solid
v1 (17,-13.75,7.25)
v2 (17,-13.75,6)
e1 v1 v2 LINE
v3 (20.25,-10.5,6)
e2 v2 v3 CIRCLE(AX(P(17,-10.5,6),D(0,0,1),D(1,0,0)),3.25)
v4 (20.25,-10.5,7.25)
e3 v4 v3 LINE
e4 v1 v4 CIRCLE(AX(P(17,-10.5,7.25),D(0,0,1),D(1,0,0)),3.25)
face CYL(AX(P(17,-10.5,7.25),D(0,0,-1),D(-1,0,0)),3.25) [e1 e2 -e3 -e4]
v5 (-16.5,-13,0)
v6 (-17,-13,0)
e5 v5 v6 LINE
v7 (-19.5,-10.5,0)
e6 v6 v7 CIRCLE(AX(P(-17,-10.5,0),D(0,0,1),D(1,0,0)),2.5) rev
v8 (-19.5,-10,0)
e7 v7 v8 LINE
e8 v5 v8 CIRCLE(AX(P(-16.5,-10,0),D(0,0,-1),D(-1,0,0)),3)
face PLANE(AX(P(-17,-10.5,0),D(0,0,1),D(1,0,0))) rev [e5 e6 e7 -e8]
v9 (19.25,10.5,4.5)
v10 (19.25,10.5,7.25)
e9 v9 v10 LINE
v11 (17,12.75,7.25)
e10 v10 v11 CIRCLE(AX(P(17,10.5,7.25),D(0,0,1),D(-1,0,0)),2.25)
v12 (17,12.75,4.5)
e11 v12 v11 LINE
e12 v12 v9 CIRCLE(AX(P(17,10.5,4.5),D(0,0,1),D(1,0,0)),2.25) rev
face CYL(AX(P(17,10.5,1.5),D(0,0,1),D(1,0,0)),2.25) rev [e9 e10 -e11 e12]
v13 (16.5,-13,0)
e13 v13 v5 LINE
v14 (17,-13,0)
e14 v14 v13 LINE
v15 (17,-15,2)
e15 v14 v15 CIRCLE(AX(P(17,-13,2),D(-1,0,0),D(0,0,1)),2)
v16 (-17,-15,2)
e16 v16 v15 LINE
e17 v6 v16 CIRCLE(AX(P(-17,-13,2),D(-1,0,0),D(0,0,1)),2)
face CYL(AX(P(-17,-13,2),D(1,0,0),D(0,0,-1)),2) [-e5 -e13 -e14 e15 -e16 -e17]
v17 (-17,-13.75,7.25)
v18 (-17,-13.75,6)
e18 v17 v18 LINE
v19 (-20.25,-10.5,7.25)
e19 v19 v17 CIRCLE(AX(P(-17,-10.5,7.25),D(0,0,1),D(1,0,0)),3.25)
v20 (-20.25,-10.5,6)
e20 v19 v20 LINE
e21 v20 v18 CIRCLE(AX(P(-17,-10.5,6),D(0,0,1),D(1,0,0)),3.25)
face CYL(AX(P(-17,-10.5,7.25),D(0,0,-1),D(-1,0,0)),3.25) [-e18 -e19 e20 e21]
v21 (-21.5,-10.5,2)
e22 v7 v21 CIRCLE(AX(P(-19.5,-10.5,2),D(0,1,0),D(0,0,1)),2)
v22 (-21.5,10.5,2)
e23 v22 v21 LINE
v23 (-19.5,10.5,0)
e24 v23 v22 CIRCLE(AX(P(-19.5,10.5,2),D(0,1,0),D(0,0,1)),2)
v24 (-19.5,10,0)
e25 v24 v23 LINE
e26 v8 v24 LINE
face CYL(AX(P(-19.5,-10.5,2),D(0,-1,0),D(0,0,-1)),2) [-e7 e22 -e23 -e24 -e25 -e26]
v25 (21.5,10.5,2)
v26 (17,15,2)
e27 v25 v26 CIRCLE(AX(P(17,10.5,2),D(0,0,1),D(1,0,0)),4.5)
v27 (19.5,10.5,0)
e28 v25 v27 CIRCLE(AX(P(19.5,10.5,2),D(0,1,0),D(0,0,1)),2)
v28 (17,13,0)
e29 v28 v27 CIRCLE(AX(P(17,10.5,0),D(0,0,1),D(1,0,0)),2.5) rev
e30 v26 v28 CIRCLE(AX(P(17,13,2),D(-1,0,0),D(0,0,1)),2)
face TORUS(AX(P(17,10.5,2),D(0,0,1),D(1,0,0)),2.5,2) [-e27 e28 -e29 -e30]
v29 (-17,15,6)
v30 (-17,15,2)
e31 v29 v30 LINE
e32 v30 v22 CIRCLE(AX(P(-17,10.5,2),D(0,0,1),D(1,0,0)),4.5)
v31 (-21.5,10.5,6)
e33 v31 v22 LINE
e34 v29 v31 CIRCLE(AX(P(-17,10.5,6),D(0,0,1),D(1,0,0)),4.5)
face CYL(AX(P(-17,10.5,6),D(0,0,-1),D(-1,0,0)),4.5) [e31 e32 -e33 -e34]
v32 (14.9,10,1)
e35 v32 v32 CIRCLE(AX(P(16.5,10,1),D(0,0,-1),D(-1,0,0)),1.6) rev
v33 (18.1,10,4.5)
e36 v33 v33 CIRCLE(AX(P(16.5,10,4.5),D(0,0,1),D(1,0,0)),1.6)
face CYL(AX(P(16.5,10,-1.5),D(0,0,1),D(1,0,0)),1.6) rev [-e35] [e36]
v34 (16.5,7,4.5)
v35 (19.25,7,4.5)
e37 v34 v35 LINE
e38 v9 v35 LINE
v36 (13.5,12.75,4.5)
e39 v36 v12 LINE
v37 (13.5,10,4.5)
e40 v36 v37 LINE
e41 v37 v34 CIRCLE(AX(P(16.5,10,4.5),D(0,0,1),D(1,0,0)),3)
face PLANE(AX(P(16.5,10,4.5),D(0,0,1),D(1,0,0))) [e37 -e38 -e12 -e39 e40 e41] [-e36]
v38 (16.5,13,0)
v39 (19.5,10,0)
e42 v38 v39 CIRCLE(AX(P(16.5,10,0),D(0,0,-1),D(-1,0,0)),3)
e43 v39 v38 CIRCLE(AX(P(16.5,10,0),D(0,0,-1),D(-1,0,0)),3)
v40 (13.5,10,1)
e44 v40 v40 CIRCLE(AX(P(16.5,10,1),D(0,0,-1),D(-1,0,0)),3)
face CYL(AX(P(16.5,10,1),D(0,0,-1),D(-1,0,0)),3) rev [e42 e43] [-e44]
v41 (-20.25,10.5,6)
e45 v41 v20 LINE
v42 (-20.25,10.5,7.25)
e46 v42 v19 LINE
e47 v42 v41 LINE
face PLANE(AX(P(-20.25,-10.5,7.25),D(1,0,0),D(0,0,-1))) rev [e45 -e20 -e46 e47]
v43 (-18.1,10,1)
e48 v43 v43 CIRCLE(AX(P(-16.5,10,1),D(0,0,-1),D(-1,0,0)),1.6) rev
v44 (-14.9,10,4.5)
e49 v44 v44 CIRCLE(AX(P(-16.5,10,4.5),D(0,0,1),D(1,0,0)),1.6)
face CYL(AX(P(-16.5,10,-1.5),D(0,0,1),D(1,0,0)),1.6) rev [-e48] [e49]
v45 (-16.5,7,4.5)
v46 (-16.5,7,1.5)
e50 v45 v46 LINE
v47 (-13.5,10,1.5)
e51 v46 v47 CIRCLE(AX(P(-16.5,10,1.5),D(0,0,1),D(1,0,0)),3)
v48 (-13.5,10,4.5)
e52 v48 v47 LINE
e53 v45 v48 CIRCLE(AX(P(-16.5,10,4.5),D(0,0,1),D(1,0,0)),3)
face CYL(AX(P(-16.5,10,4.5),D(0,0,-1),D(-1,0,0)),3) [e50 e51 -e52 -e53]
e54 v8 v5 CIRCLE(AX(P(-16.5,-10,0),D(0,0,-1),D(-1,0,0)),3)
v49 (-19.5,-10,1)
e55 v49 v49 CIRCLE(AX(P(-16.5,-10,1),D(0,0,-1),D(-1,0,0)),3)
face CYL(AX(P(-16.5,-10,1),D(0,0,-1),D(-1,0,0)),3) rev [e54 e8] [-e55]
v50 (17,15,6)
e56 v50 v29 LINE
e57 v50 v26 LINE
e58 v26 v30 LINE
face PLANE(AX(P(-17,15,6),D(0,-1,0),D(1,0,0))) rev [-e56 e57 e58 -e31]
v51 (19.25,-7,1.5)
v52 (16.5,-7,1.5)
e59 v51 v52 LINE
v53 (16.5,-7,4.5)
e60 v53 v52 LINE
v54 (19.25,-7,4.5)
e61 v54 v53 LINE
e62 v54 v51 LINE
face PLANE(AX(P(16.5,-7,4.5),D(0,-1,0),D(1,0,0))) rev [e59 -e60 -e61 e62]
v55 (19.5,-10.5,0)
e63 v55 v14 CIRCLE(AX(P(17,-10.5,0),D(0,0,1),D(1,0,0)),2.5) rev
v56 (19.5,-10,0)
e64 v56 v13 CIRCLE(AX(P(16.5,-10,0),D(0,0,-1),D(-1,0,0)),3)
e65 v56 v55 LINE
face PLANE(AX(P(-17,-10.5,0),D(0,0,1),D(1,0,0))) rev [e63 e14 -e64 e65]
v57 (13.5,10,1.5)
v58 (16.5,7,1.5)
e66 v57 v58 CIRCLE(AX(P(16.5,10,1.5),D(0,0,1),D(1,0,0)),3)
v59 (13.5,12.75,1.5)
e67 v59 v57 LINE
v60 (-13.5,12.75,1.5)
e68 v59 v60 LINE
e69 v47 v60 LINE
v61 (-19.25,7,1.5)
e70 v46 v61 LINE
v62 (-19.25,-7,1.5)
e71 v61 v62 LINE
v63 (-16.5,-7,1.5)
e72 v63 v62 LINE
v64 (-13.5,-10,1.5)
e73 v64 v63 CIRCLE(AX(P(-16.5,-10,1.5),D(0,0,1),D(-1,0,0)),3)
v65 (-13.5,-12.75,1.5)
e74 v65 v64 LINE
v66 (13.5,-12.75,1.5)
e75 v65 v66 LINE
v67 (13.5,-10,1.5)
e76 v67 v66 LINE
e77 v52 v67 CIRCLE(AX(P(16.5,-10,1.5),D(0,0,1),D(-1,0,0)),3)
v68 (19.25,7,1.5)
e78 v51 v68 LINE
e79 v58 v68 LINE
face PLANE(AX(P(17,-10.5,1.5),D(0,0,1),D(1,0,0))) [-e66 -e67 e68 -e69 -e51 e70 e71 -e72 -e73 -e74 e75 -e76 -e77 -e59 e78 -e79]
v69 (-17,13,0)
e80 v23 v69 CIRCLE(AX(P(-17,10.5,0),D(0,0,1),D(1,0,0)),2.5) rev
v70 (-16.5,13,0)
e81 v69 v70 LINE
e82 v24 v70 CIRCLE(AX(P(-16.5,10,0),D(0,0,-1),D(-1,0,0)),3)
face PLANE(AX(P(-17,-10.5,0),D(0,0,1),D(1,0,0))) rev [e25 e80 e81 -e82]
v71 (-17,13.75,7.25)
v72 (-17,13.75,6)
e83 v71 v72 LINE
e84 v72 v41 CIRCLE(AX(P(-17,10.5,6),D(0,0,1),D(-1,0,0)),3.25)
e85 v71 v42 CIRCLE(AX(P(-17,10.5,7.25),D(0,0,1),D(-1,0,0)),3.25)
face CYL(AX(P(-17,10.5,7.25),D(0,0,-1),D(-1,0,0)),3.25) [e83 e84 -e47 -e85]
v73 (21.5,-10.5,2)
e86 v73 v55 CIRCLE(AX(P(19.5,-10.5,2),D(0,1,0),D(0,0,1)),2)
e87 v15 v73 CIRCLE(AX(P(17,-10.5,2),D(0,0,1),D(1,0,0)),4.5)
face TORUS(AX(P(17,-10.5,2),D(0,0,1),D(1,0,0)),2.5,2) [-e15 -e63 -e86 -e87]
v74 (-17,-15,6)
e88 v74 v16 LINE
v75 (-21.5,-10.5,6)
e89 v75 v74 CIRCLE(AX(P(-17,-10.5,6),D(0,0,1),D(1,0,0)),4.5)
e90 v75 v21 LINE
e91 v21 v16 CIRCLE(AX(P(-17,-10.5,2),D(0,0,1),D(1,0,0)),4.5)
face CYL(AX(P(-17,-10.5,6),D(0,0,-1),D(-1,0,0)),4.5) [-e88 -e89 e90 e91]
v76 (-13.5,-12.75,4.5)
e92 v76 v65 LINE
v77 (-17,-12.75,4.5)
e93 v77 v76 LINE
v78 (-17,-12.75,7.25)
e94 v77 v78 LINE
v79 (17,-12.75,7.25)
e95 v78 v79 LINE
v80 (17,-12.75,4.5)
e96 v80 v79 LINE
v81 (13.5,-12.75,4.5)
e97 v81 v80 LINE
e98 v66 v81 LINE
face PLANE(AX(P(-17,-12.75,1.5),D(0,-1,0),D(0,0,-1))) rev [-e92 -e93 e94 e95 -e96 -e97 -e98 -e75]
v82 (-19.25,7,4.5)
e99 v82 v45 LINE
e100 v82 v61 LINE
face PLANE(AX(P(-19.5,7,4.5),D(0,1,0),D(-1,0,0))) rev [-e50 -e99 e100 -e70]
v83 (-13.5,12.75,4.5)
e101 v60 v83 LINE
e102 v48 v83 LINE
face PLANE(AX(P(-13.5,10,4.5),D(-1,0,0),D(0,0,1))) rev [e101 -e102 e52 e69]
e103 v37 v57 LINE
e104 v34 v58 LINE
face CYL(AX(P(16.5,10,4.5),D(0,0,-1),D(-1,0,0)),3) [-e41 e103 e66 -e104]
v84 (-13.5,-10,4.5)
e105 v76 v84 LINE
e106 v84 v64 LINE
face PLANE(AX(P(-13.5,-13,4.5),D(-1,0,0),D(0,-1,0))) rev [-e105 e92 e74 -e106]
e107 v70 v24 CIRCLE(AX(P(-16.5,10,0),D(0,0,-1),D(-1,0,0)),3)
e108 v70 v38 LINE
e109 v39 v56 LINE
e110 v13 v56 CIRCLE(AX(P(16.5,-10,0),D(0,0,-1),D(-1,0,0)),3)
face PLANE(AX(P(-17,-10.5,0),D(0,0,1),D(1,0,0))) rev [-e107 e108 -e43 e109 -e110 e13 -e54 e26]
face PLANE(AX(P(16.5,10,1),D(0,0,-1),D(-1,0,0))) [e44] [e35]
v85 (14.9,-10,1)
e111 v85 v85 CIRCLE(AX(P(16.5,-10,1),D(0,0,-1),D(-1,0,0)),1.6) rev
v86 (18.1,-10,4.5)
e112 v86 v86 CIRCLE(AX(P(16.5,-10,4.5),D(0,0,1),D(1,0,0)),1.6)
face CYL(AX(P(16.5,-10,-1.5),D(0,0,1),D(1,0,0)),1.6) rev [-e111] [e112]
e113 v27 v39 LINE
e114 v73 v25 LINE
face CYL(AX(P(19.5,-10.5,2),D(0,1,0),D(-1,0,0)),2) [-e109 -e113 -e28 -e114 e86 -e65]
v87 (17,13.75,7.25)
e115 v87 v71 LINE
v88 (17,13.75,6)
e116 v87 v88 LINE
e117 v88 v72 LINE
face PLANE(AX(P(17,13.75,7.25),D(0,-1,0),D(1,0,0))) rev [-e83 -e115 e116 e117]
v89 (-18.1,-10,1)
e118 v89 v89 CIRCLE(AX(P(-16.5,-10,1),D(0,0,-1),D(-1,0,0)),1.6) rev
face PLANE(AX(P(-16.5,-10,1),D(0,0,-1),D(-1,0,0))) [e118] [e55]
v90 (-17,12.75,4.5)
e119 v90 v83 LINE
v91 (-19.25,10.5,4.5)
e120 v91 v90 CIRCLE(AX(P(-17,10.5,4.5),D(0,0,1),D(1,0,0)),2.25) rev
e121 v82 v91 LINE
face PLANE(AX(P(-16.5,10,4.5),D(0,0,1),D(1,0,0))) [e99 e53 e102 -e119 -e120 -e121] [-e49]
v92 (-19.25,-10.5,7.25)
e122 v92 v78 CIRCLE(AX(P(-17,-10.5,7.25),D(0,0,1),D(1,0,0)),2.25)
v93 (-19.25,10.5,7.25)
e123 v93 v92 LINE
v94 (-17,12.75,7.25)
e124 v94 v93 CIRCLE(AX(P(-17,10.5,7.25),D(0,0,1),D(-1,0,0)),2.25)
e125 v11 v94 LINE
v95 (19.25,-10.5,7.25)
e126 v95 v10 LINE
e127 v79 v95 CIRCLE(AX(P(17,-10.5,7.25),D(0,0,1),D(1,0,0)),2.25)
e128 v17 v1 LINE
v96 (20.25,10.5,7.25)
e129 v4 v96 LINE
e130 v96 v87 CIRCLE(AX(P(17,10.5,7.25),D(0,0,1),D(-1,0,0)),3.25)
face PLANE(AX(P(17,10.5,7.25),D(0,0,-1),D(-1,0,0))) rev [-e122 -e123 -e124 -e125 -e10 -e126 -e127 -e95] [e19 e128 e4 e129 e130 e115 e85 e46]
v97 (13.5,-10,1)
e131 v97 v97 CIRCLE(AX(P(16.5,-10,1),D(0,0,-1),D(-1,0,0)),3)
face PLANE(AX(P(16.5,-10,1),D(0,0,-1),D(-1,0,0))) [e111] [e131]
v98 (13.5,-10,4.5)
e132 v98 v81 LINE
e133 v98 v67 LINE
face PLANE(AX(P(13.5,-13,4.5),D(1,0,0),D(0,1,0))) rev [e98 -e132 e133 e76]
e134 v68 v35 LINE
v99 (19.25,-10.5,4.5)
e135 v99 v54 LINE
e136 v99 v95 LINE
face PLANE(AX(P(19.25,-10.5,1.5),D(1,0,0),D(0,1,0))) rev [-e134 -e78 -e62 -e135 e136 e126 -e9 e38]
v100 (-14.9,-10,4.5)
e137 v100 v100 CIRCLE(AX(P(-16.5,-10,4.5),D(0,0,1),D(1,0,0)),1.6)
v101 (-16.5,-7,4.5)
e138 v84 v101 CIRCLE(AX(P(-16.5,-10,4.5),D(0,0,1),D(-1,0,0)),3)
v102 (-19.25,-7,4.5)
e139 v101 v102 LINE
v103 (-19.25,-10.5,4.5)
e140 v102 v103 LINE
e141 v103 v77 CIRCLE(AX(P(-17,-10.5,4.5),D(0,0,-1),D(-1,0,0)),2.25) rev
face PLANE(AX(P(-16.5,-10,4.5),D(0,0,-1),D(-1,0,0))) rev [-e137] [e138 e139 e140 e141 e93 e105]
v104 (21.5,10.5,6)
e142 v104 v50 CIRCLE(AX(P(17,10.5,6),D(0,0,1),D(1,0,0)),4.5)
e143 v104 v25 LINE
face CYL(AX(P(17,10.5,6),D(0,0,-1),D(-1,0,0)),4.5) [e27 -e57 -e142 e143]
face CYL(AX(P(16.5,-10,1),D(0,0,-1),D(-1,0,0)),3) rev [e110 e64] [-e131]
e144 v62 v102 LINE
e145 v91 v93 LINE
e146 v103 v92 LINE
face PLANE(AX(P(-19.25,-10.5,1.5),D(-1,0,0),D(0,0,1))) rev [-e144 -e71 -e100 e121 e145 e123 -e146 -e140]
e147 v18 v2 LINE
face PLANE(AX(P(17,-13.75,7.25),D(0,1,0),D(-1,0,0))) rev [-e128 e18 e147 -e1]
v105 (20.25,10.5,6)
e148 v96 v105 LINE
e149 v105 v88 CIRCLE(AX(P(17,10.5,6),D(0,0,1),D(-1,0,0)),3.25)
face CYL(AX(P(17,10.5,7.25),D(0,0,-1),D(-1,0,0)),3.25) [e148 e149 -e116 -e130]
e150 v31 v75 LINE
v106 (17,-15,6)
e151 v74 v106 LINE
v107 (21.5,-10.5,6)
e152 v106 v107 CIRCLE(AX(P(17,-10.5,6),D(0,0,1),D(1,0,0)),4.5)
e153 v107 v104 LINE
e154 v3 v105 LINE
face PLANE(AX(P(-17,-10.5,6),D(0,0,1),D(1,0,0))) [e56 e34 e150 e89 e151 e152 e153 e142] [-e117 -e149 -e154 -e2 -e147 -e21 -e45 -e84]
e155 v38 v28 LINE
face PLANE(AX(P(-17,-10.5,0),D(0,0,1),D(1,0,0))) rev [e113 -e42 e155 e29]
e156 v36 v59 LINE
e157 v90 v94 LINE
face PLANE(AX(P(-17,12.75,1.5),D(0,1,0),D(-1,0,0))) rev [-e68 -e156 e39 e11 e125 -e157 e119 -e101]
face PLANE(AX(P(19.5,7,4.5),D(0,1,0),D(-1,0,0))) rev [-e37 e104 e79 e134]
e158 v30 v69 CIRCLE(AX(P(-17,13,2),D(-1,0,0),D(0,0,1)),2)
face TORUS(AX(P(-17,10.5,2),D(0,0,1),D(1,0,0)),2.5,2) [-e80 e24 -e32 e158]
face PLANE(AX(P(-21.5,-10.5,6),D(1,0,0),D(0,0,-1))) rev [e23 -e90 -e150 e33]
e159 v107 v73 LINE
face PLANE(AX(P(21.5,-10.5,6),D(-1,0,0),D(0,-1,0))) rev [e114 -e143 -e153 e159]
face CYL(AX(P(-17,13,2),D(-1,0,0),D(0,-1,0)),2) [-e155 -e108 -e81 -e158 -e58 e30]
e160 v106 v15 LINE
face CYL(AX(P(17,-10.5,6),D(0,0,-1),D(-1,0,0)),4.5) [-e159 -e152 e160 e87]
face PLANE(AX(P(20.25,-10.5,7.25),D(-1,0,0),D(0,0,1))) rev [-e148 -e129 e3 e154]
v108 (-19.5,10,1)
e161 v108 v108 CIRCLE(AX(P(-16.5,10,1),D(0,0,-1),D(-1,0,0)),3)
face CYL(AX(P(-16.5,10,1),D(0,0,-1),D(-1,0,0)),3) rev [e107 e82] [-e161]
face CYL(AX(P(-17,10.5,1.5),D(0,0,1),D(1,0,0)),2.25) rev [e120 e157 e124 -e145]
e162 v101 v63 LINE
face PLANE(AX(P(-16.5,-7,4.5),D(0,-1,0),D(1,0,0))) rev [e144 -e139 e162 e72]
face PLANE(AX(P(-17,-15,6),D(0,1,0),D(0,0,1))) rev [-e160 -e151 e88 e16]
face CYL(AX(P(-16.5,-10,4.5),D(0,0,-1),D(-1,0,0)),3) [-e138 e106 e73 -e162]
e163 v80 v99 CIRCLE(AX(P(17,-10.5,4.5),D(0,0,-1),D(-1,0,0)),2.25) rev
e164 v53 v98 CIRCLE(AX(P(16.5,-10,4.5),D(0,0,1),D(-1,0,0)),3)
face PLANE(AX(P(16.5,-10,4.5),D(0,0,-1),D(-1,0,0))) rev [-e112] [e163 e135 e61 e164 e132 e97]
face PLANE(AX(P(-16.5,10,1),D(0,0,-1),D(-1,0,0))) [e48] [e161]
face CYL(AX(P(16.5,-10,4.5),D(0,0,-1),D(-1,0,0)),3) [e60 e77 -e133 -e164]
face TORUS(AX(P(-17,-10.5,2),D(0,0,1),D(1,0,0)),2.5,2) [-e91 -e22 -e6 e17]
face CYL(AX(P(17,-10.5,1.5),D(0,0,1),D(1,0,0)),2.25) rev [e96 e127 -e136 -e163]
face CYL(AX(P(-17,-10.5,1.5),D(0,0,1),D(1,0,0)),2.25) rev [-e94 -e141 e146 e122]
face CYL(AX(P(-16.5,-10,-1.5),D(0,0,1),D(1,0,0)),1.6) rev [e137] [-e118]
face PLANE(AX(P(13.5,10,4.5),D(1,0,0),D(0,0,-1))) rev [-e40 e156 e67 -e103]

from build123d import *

# Parameters (mm, degrees)
EXTRUDE_1_DEPTH     = 6
CUT_EXTRUDE_1_DEPTH = 4.5
EXTRUDE_4_DEPTH     = 3
SKETCH_4_R          = 1.6
CUT_EXTRUDE_2_DEPTH = 6
EXTRUDE_START       = 1.25
EXTRUDE_5_DEPTH     = 1.25
SKETCH_6_R          = 3
CUT_EXTRUDE_3_DEPTH = 1
FILLET_1_R          = 2


with BuildPart() as part:
    # Эскиз1 → Бобышка-Вытянуть1 (new body)
    with BuildSketch(Plane.XY):
        with BuildLine():
            Line((-17, -15), (17, -15))
            ThreePointArc((17, -15), (20.181980515, -13.681980515), (21.5, -10.5))
            Line((21.5, -10.5), (21.5, 10.5))
            ThreePointArc((21.5, 10.5), (20.181980515, 13.681980515), (17, 15))
            Line((17, 15), (-17, 15))
            ThreePointArc((-17, 15), (-20.181980515, 13.681980515), (-21.5, 10.5))
            Line((-21.5, 10.5), (-21.5, -10.5))
            ThreePointArc((-21.5, -10.5), (-20.181980515, -13.681980515), (-17, -15))
        make_face()
    extrude(amount=EXTRUDE_1_DEPTH)

    # Эскиз2 → Вырез-Вытянуть1 (cut)
    with BuildSketch(Plane.XY.offset(6)):
        with BuildLine():
            Line((-17, -12.75), (17, -12.75))
            ThreePointArc((17, -12.75), (18.590990258, -12.090990258), (19.25, -10.5))
            Line((19.25, -10.5), (19.25, 10.5))
            ThreePointArc((19.25, 10.5), (18.590990258, 12.090990258), (17, 12.75))
            Line((17, 12.75), (-17, 12.75))
            ThreePointArc((-17, 12.75), (-18.590990258, 12.090990258), (-19.25, 10.5))
            Line((-19.25, 10.5), (-19.25, -10.5))
            ThreePointArc((-19.25, -10.5), (-18.590990258, -12.090990258), (-17, -12.75))
        make_face()
    extrude(amount=-CUT_EXTRUDE_1_DEPTH, mode=Mode.SUBTRACT)

    # Эскиз3 → Бобышка-Вытянуть4 (add)
    with BuildSketch(Plane.XY.offset(1.5)):
        with BuildLine():
            Line((-13.5, 10), (-13.5, 13))
            Line((-13.5, 13), (-19.5, 13))
            Line((-19.5, 13), (-19.5, 7))
            Line((-19.5, 7), (-16.5, 7))
            ThreePointArc((-16.5, 7), (-14.378679656, 7.878679656), (-13.5, 10))
        make_face()
        with BuildLine():
            Line((-16.5, -7), (-19.5, -7))
            Line((-19.5, -7), (-19.5, -13))
            Line((-19.5, -13), (-13.5, -13))
            Line((-13.5, -13), (-13.5, -10))
            ThreePointArc((-13.5, -10), (-14.378679656, -7.878679656), (-16.5, -7))
        make_face()
        with BuildLine():
            Line((16.5, -7), (19.5, -7))
            Line((19.5, -7), (19.5, -13))
            Line((19.5, -13), (13.5, -13))
            Line((13.5, -13), (13.5, -10))
            ThreePointArc((13.5, -10), (14.378679656, -7.878679656), (16.5, -7))
        make_face()
        with BuildLine():
            Line((13.5, 10), (13.5, 13))
            Line((13.5, 13), (19.5, 13))
            Line((19.5, 13), (19.5, 7))
            Line((19.5, 7), (16.5, 7))
            ThreePointArc((16.5, 7), (14.378679656, 7.878679656), (13.5, 10))
        make_face()
    extrude(amount=EXTRUDE_4_DEPTH)

    # Эскиз4 → Вырез-Вытянуть2 (cut)
    with BuildSketch(Plane.XY.offset(4.5)):
        with Locations((16.5, -10)):
            Circle(SKETCH_4_R)
        with Locations((-16.5, -10)):
            Circle(SKETCH_4_R)
        with Locations((-16.5, 10)):
            Circle(SKETCH_4_R)
        with Locations((16.5, 10)):
            Circle(SKETCH_4_R)
    extrude(amount=-CUT_EXTRUDE_2_DEPTH, mode=Mode.SUBTRACT)

    # Эскиз5 → Бобышка-Вытянуть5 (add)
    with BuildSketch(Plane.XY.offset(6).offset(EXTRUDE_START)):
        with BuildLine():
            Line((17, -13.75), (-17, -13.75))
            ThreePointArc((-17, -13.75), (-19.298097039, -12.798097039), (-20.25, -10.5))
            Line((-20.25, -10.5), (-20.25, 10.5))
            ThreePointArc((-20.25, 10.5), (-19.298097039, 12.798097039), (-17, 13.75))
            Line((-17, 13.75), (17, 13.75))
            ThreePointArc((17, 13.75), (19.298097039, 12.798097039), (20.25, 10.5))
            Line((20.25, 10.5), (20.25, -10.5))
            ThreePointArc((20.25, -10.5), (19.298097039, -12.798097039), (17, -13.75))
        make_face()
        with BuildLine():
            Line((17, -12.75), (-17, -12.75))
            ThreePointArc((-17, -12.75), (-18.590990258, -12.090990258), (-19.25, -10.5))
            Line((-19.25, -10.5), (-19.25, 10.5))
            ThreePointArc((-19.25, 10.5), (-18.590990258, 12.090990258), (-17, 12.75))
            Line((-17, 12.75), (17, 12.75))
            ThreePointArc((17, 12.75), (18.590990258, 12.090990258), (19.25, 10.5))
            Line((19.25, 10.5), (19.25, -10.5))
            ThreePointArc((19.25, -10.5), (18.590990258, -12.090990258), (17, -12.75))
        make_face(mode=Mode.SUBTRACT)
    extrude(amount=-EXTRUDE_5_DEPTH)

    # Эскиз6 → Вырез-Вытянуть3 (cut)
    with BuildSketch(Plane(origin=(0, 0, 0), x_dir=(-1, 0, 0), z_dir=(0, 0, -1))):
        with Locations((16.5, -10)):
            Circle(SKETCH_6_R)
        with Locations((-16.5, -10)):
            Circle(SKETCH_6_R)
        with Locations((16.5, 10)):
            Circle(SKETCH_6_R)
        with Locations((-16.5, 10)):
            Circle(SKETCH_6_R)
    extrude(amount=-CUT_EXTRUDE_3_DEPTH, mode=Mode.SUBTRACT)

    # Скругление1
    fillet_1_edges = [part.edges().sort_by_distance(p)[0] for p in [
        (21.5, 0, 0),
        (20.181980515, -13.681980515, 0),
        (0, -15, 0),
        (-20.181980515, -13.681980515, 0),
        (-21.5, 0, 0),
        (-20.181980515, 13.681980515, 0),
        (0, 15, 0),
        (20.181980515, 13.681980515, 0),
    ]]
    fillet(fillet_1_edges, radius=FILLET_1_R - 0.0001)  # a hair under: the kernel refuses the full size


solid = part.part
